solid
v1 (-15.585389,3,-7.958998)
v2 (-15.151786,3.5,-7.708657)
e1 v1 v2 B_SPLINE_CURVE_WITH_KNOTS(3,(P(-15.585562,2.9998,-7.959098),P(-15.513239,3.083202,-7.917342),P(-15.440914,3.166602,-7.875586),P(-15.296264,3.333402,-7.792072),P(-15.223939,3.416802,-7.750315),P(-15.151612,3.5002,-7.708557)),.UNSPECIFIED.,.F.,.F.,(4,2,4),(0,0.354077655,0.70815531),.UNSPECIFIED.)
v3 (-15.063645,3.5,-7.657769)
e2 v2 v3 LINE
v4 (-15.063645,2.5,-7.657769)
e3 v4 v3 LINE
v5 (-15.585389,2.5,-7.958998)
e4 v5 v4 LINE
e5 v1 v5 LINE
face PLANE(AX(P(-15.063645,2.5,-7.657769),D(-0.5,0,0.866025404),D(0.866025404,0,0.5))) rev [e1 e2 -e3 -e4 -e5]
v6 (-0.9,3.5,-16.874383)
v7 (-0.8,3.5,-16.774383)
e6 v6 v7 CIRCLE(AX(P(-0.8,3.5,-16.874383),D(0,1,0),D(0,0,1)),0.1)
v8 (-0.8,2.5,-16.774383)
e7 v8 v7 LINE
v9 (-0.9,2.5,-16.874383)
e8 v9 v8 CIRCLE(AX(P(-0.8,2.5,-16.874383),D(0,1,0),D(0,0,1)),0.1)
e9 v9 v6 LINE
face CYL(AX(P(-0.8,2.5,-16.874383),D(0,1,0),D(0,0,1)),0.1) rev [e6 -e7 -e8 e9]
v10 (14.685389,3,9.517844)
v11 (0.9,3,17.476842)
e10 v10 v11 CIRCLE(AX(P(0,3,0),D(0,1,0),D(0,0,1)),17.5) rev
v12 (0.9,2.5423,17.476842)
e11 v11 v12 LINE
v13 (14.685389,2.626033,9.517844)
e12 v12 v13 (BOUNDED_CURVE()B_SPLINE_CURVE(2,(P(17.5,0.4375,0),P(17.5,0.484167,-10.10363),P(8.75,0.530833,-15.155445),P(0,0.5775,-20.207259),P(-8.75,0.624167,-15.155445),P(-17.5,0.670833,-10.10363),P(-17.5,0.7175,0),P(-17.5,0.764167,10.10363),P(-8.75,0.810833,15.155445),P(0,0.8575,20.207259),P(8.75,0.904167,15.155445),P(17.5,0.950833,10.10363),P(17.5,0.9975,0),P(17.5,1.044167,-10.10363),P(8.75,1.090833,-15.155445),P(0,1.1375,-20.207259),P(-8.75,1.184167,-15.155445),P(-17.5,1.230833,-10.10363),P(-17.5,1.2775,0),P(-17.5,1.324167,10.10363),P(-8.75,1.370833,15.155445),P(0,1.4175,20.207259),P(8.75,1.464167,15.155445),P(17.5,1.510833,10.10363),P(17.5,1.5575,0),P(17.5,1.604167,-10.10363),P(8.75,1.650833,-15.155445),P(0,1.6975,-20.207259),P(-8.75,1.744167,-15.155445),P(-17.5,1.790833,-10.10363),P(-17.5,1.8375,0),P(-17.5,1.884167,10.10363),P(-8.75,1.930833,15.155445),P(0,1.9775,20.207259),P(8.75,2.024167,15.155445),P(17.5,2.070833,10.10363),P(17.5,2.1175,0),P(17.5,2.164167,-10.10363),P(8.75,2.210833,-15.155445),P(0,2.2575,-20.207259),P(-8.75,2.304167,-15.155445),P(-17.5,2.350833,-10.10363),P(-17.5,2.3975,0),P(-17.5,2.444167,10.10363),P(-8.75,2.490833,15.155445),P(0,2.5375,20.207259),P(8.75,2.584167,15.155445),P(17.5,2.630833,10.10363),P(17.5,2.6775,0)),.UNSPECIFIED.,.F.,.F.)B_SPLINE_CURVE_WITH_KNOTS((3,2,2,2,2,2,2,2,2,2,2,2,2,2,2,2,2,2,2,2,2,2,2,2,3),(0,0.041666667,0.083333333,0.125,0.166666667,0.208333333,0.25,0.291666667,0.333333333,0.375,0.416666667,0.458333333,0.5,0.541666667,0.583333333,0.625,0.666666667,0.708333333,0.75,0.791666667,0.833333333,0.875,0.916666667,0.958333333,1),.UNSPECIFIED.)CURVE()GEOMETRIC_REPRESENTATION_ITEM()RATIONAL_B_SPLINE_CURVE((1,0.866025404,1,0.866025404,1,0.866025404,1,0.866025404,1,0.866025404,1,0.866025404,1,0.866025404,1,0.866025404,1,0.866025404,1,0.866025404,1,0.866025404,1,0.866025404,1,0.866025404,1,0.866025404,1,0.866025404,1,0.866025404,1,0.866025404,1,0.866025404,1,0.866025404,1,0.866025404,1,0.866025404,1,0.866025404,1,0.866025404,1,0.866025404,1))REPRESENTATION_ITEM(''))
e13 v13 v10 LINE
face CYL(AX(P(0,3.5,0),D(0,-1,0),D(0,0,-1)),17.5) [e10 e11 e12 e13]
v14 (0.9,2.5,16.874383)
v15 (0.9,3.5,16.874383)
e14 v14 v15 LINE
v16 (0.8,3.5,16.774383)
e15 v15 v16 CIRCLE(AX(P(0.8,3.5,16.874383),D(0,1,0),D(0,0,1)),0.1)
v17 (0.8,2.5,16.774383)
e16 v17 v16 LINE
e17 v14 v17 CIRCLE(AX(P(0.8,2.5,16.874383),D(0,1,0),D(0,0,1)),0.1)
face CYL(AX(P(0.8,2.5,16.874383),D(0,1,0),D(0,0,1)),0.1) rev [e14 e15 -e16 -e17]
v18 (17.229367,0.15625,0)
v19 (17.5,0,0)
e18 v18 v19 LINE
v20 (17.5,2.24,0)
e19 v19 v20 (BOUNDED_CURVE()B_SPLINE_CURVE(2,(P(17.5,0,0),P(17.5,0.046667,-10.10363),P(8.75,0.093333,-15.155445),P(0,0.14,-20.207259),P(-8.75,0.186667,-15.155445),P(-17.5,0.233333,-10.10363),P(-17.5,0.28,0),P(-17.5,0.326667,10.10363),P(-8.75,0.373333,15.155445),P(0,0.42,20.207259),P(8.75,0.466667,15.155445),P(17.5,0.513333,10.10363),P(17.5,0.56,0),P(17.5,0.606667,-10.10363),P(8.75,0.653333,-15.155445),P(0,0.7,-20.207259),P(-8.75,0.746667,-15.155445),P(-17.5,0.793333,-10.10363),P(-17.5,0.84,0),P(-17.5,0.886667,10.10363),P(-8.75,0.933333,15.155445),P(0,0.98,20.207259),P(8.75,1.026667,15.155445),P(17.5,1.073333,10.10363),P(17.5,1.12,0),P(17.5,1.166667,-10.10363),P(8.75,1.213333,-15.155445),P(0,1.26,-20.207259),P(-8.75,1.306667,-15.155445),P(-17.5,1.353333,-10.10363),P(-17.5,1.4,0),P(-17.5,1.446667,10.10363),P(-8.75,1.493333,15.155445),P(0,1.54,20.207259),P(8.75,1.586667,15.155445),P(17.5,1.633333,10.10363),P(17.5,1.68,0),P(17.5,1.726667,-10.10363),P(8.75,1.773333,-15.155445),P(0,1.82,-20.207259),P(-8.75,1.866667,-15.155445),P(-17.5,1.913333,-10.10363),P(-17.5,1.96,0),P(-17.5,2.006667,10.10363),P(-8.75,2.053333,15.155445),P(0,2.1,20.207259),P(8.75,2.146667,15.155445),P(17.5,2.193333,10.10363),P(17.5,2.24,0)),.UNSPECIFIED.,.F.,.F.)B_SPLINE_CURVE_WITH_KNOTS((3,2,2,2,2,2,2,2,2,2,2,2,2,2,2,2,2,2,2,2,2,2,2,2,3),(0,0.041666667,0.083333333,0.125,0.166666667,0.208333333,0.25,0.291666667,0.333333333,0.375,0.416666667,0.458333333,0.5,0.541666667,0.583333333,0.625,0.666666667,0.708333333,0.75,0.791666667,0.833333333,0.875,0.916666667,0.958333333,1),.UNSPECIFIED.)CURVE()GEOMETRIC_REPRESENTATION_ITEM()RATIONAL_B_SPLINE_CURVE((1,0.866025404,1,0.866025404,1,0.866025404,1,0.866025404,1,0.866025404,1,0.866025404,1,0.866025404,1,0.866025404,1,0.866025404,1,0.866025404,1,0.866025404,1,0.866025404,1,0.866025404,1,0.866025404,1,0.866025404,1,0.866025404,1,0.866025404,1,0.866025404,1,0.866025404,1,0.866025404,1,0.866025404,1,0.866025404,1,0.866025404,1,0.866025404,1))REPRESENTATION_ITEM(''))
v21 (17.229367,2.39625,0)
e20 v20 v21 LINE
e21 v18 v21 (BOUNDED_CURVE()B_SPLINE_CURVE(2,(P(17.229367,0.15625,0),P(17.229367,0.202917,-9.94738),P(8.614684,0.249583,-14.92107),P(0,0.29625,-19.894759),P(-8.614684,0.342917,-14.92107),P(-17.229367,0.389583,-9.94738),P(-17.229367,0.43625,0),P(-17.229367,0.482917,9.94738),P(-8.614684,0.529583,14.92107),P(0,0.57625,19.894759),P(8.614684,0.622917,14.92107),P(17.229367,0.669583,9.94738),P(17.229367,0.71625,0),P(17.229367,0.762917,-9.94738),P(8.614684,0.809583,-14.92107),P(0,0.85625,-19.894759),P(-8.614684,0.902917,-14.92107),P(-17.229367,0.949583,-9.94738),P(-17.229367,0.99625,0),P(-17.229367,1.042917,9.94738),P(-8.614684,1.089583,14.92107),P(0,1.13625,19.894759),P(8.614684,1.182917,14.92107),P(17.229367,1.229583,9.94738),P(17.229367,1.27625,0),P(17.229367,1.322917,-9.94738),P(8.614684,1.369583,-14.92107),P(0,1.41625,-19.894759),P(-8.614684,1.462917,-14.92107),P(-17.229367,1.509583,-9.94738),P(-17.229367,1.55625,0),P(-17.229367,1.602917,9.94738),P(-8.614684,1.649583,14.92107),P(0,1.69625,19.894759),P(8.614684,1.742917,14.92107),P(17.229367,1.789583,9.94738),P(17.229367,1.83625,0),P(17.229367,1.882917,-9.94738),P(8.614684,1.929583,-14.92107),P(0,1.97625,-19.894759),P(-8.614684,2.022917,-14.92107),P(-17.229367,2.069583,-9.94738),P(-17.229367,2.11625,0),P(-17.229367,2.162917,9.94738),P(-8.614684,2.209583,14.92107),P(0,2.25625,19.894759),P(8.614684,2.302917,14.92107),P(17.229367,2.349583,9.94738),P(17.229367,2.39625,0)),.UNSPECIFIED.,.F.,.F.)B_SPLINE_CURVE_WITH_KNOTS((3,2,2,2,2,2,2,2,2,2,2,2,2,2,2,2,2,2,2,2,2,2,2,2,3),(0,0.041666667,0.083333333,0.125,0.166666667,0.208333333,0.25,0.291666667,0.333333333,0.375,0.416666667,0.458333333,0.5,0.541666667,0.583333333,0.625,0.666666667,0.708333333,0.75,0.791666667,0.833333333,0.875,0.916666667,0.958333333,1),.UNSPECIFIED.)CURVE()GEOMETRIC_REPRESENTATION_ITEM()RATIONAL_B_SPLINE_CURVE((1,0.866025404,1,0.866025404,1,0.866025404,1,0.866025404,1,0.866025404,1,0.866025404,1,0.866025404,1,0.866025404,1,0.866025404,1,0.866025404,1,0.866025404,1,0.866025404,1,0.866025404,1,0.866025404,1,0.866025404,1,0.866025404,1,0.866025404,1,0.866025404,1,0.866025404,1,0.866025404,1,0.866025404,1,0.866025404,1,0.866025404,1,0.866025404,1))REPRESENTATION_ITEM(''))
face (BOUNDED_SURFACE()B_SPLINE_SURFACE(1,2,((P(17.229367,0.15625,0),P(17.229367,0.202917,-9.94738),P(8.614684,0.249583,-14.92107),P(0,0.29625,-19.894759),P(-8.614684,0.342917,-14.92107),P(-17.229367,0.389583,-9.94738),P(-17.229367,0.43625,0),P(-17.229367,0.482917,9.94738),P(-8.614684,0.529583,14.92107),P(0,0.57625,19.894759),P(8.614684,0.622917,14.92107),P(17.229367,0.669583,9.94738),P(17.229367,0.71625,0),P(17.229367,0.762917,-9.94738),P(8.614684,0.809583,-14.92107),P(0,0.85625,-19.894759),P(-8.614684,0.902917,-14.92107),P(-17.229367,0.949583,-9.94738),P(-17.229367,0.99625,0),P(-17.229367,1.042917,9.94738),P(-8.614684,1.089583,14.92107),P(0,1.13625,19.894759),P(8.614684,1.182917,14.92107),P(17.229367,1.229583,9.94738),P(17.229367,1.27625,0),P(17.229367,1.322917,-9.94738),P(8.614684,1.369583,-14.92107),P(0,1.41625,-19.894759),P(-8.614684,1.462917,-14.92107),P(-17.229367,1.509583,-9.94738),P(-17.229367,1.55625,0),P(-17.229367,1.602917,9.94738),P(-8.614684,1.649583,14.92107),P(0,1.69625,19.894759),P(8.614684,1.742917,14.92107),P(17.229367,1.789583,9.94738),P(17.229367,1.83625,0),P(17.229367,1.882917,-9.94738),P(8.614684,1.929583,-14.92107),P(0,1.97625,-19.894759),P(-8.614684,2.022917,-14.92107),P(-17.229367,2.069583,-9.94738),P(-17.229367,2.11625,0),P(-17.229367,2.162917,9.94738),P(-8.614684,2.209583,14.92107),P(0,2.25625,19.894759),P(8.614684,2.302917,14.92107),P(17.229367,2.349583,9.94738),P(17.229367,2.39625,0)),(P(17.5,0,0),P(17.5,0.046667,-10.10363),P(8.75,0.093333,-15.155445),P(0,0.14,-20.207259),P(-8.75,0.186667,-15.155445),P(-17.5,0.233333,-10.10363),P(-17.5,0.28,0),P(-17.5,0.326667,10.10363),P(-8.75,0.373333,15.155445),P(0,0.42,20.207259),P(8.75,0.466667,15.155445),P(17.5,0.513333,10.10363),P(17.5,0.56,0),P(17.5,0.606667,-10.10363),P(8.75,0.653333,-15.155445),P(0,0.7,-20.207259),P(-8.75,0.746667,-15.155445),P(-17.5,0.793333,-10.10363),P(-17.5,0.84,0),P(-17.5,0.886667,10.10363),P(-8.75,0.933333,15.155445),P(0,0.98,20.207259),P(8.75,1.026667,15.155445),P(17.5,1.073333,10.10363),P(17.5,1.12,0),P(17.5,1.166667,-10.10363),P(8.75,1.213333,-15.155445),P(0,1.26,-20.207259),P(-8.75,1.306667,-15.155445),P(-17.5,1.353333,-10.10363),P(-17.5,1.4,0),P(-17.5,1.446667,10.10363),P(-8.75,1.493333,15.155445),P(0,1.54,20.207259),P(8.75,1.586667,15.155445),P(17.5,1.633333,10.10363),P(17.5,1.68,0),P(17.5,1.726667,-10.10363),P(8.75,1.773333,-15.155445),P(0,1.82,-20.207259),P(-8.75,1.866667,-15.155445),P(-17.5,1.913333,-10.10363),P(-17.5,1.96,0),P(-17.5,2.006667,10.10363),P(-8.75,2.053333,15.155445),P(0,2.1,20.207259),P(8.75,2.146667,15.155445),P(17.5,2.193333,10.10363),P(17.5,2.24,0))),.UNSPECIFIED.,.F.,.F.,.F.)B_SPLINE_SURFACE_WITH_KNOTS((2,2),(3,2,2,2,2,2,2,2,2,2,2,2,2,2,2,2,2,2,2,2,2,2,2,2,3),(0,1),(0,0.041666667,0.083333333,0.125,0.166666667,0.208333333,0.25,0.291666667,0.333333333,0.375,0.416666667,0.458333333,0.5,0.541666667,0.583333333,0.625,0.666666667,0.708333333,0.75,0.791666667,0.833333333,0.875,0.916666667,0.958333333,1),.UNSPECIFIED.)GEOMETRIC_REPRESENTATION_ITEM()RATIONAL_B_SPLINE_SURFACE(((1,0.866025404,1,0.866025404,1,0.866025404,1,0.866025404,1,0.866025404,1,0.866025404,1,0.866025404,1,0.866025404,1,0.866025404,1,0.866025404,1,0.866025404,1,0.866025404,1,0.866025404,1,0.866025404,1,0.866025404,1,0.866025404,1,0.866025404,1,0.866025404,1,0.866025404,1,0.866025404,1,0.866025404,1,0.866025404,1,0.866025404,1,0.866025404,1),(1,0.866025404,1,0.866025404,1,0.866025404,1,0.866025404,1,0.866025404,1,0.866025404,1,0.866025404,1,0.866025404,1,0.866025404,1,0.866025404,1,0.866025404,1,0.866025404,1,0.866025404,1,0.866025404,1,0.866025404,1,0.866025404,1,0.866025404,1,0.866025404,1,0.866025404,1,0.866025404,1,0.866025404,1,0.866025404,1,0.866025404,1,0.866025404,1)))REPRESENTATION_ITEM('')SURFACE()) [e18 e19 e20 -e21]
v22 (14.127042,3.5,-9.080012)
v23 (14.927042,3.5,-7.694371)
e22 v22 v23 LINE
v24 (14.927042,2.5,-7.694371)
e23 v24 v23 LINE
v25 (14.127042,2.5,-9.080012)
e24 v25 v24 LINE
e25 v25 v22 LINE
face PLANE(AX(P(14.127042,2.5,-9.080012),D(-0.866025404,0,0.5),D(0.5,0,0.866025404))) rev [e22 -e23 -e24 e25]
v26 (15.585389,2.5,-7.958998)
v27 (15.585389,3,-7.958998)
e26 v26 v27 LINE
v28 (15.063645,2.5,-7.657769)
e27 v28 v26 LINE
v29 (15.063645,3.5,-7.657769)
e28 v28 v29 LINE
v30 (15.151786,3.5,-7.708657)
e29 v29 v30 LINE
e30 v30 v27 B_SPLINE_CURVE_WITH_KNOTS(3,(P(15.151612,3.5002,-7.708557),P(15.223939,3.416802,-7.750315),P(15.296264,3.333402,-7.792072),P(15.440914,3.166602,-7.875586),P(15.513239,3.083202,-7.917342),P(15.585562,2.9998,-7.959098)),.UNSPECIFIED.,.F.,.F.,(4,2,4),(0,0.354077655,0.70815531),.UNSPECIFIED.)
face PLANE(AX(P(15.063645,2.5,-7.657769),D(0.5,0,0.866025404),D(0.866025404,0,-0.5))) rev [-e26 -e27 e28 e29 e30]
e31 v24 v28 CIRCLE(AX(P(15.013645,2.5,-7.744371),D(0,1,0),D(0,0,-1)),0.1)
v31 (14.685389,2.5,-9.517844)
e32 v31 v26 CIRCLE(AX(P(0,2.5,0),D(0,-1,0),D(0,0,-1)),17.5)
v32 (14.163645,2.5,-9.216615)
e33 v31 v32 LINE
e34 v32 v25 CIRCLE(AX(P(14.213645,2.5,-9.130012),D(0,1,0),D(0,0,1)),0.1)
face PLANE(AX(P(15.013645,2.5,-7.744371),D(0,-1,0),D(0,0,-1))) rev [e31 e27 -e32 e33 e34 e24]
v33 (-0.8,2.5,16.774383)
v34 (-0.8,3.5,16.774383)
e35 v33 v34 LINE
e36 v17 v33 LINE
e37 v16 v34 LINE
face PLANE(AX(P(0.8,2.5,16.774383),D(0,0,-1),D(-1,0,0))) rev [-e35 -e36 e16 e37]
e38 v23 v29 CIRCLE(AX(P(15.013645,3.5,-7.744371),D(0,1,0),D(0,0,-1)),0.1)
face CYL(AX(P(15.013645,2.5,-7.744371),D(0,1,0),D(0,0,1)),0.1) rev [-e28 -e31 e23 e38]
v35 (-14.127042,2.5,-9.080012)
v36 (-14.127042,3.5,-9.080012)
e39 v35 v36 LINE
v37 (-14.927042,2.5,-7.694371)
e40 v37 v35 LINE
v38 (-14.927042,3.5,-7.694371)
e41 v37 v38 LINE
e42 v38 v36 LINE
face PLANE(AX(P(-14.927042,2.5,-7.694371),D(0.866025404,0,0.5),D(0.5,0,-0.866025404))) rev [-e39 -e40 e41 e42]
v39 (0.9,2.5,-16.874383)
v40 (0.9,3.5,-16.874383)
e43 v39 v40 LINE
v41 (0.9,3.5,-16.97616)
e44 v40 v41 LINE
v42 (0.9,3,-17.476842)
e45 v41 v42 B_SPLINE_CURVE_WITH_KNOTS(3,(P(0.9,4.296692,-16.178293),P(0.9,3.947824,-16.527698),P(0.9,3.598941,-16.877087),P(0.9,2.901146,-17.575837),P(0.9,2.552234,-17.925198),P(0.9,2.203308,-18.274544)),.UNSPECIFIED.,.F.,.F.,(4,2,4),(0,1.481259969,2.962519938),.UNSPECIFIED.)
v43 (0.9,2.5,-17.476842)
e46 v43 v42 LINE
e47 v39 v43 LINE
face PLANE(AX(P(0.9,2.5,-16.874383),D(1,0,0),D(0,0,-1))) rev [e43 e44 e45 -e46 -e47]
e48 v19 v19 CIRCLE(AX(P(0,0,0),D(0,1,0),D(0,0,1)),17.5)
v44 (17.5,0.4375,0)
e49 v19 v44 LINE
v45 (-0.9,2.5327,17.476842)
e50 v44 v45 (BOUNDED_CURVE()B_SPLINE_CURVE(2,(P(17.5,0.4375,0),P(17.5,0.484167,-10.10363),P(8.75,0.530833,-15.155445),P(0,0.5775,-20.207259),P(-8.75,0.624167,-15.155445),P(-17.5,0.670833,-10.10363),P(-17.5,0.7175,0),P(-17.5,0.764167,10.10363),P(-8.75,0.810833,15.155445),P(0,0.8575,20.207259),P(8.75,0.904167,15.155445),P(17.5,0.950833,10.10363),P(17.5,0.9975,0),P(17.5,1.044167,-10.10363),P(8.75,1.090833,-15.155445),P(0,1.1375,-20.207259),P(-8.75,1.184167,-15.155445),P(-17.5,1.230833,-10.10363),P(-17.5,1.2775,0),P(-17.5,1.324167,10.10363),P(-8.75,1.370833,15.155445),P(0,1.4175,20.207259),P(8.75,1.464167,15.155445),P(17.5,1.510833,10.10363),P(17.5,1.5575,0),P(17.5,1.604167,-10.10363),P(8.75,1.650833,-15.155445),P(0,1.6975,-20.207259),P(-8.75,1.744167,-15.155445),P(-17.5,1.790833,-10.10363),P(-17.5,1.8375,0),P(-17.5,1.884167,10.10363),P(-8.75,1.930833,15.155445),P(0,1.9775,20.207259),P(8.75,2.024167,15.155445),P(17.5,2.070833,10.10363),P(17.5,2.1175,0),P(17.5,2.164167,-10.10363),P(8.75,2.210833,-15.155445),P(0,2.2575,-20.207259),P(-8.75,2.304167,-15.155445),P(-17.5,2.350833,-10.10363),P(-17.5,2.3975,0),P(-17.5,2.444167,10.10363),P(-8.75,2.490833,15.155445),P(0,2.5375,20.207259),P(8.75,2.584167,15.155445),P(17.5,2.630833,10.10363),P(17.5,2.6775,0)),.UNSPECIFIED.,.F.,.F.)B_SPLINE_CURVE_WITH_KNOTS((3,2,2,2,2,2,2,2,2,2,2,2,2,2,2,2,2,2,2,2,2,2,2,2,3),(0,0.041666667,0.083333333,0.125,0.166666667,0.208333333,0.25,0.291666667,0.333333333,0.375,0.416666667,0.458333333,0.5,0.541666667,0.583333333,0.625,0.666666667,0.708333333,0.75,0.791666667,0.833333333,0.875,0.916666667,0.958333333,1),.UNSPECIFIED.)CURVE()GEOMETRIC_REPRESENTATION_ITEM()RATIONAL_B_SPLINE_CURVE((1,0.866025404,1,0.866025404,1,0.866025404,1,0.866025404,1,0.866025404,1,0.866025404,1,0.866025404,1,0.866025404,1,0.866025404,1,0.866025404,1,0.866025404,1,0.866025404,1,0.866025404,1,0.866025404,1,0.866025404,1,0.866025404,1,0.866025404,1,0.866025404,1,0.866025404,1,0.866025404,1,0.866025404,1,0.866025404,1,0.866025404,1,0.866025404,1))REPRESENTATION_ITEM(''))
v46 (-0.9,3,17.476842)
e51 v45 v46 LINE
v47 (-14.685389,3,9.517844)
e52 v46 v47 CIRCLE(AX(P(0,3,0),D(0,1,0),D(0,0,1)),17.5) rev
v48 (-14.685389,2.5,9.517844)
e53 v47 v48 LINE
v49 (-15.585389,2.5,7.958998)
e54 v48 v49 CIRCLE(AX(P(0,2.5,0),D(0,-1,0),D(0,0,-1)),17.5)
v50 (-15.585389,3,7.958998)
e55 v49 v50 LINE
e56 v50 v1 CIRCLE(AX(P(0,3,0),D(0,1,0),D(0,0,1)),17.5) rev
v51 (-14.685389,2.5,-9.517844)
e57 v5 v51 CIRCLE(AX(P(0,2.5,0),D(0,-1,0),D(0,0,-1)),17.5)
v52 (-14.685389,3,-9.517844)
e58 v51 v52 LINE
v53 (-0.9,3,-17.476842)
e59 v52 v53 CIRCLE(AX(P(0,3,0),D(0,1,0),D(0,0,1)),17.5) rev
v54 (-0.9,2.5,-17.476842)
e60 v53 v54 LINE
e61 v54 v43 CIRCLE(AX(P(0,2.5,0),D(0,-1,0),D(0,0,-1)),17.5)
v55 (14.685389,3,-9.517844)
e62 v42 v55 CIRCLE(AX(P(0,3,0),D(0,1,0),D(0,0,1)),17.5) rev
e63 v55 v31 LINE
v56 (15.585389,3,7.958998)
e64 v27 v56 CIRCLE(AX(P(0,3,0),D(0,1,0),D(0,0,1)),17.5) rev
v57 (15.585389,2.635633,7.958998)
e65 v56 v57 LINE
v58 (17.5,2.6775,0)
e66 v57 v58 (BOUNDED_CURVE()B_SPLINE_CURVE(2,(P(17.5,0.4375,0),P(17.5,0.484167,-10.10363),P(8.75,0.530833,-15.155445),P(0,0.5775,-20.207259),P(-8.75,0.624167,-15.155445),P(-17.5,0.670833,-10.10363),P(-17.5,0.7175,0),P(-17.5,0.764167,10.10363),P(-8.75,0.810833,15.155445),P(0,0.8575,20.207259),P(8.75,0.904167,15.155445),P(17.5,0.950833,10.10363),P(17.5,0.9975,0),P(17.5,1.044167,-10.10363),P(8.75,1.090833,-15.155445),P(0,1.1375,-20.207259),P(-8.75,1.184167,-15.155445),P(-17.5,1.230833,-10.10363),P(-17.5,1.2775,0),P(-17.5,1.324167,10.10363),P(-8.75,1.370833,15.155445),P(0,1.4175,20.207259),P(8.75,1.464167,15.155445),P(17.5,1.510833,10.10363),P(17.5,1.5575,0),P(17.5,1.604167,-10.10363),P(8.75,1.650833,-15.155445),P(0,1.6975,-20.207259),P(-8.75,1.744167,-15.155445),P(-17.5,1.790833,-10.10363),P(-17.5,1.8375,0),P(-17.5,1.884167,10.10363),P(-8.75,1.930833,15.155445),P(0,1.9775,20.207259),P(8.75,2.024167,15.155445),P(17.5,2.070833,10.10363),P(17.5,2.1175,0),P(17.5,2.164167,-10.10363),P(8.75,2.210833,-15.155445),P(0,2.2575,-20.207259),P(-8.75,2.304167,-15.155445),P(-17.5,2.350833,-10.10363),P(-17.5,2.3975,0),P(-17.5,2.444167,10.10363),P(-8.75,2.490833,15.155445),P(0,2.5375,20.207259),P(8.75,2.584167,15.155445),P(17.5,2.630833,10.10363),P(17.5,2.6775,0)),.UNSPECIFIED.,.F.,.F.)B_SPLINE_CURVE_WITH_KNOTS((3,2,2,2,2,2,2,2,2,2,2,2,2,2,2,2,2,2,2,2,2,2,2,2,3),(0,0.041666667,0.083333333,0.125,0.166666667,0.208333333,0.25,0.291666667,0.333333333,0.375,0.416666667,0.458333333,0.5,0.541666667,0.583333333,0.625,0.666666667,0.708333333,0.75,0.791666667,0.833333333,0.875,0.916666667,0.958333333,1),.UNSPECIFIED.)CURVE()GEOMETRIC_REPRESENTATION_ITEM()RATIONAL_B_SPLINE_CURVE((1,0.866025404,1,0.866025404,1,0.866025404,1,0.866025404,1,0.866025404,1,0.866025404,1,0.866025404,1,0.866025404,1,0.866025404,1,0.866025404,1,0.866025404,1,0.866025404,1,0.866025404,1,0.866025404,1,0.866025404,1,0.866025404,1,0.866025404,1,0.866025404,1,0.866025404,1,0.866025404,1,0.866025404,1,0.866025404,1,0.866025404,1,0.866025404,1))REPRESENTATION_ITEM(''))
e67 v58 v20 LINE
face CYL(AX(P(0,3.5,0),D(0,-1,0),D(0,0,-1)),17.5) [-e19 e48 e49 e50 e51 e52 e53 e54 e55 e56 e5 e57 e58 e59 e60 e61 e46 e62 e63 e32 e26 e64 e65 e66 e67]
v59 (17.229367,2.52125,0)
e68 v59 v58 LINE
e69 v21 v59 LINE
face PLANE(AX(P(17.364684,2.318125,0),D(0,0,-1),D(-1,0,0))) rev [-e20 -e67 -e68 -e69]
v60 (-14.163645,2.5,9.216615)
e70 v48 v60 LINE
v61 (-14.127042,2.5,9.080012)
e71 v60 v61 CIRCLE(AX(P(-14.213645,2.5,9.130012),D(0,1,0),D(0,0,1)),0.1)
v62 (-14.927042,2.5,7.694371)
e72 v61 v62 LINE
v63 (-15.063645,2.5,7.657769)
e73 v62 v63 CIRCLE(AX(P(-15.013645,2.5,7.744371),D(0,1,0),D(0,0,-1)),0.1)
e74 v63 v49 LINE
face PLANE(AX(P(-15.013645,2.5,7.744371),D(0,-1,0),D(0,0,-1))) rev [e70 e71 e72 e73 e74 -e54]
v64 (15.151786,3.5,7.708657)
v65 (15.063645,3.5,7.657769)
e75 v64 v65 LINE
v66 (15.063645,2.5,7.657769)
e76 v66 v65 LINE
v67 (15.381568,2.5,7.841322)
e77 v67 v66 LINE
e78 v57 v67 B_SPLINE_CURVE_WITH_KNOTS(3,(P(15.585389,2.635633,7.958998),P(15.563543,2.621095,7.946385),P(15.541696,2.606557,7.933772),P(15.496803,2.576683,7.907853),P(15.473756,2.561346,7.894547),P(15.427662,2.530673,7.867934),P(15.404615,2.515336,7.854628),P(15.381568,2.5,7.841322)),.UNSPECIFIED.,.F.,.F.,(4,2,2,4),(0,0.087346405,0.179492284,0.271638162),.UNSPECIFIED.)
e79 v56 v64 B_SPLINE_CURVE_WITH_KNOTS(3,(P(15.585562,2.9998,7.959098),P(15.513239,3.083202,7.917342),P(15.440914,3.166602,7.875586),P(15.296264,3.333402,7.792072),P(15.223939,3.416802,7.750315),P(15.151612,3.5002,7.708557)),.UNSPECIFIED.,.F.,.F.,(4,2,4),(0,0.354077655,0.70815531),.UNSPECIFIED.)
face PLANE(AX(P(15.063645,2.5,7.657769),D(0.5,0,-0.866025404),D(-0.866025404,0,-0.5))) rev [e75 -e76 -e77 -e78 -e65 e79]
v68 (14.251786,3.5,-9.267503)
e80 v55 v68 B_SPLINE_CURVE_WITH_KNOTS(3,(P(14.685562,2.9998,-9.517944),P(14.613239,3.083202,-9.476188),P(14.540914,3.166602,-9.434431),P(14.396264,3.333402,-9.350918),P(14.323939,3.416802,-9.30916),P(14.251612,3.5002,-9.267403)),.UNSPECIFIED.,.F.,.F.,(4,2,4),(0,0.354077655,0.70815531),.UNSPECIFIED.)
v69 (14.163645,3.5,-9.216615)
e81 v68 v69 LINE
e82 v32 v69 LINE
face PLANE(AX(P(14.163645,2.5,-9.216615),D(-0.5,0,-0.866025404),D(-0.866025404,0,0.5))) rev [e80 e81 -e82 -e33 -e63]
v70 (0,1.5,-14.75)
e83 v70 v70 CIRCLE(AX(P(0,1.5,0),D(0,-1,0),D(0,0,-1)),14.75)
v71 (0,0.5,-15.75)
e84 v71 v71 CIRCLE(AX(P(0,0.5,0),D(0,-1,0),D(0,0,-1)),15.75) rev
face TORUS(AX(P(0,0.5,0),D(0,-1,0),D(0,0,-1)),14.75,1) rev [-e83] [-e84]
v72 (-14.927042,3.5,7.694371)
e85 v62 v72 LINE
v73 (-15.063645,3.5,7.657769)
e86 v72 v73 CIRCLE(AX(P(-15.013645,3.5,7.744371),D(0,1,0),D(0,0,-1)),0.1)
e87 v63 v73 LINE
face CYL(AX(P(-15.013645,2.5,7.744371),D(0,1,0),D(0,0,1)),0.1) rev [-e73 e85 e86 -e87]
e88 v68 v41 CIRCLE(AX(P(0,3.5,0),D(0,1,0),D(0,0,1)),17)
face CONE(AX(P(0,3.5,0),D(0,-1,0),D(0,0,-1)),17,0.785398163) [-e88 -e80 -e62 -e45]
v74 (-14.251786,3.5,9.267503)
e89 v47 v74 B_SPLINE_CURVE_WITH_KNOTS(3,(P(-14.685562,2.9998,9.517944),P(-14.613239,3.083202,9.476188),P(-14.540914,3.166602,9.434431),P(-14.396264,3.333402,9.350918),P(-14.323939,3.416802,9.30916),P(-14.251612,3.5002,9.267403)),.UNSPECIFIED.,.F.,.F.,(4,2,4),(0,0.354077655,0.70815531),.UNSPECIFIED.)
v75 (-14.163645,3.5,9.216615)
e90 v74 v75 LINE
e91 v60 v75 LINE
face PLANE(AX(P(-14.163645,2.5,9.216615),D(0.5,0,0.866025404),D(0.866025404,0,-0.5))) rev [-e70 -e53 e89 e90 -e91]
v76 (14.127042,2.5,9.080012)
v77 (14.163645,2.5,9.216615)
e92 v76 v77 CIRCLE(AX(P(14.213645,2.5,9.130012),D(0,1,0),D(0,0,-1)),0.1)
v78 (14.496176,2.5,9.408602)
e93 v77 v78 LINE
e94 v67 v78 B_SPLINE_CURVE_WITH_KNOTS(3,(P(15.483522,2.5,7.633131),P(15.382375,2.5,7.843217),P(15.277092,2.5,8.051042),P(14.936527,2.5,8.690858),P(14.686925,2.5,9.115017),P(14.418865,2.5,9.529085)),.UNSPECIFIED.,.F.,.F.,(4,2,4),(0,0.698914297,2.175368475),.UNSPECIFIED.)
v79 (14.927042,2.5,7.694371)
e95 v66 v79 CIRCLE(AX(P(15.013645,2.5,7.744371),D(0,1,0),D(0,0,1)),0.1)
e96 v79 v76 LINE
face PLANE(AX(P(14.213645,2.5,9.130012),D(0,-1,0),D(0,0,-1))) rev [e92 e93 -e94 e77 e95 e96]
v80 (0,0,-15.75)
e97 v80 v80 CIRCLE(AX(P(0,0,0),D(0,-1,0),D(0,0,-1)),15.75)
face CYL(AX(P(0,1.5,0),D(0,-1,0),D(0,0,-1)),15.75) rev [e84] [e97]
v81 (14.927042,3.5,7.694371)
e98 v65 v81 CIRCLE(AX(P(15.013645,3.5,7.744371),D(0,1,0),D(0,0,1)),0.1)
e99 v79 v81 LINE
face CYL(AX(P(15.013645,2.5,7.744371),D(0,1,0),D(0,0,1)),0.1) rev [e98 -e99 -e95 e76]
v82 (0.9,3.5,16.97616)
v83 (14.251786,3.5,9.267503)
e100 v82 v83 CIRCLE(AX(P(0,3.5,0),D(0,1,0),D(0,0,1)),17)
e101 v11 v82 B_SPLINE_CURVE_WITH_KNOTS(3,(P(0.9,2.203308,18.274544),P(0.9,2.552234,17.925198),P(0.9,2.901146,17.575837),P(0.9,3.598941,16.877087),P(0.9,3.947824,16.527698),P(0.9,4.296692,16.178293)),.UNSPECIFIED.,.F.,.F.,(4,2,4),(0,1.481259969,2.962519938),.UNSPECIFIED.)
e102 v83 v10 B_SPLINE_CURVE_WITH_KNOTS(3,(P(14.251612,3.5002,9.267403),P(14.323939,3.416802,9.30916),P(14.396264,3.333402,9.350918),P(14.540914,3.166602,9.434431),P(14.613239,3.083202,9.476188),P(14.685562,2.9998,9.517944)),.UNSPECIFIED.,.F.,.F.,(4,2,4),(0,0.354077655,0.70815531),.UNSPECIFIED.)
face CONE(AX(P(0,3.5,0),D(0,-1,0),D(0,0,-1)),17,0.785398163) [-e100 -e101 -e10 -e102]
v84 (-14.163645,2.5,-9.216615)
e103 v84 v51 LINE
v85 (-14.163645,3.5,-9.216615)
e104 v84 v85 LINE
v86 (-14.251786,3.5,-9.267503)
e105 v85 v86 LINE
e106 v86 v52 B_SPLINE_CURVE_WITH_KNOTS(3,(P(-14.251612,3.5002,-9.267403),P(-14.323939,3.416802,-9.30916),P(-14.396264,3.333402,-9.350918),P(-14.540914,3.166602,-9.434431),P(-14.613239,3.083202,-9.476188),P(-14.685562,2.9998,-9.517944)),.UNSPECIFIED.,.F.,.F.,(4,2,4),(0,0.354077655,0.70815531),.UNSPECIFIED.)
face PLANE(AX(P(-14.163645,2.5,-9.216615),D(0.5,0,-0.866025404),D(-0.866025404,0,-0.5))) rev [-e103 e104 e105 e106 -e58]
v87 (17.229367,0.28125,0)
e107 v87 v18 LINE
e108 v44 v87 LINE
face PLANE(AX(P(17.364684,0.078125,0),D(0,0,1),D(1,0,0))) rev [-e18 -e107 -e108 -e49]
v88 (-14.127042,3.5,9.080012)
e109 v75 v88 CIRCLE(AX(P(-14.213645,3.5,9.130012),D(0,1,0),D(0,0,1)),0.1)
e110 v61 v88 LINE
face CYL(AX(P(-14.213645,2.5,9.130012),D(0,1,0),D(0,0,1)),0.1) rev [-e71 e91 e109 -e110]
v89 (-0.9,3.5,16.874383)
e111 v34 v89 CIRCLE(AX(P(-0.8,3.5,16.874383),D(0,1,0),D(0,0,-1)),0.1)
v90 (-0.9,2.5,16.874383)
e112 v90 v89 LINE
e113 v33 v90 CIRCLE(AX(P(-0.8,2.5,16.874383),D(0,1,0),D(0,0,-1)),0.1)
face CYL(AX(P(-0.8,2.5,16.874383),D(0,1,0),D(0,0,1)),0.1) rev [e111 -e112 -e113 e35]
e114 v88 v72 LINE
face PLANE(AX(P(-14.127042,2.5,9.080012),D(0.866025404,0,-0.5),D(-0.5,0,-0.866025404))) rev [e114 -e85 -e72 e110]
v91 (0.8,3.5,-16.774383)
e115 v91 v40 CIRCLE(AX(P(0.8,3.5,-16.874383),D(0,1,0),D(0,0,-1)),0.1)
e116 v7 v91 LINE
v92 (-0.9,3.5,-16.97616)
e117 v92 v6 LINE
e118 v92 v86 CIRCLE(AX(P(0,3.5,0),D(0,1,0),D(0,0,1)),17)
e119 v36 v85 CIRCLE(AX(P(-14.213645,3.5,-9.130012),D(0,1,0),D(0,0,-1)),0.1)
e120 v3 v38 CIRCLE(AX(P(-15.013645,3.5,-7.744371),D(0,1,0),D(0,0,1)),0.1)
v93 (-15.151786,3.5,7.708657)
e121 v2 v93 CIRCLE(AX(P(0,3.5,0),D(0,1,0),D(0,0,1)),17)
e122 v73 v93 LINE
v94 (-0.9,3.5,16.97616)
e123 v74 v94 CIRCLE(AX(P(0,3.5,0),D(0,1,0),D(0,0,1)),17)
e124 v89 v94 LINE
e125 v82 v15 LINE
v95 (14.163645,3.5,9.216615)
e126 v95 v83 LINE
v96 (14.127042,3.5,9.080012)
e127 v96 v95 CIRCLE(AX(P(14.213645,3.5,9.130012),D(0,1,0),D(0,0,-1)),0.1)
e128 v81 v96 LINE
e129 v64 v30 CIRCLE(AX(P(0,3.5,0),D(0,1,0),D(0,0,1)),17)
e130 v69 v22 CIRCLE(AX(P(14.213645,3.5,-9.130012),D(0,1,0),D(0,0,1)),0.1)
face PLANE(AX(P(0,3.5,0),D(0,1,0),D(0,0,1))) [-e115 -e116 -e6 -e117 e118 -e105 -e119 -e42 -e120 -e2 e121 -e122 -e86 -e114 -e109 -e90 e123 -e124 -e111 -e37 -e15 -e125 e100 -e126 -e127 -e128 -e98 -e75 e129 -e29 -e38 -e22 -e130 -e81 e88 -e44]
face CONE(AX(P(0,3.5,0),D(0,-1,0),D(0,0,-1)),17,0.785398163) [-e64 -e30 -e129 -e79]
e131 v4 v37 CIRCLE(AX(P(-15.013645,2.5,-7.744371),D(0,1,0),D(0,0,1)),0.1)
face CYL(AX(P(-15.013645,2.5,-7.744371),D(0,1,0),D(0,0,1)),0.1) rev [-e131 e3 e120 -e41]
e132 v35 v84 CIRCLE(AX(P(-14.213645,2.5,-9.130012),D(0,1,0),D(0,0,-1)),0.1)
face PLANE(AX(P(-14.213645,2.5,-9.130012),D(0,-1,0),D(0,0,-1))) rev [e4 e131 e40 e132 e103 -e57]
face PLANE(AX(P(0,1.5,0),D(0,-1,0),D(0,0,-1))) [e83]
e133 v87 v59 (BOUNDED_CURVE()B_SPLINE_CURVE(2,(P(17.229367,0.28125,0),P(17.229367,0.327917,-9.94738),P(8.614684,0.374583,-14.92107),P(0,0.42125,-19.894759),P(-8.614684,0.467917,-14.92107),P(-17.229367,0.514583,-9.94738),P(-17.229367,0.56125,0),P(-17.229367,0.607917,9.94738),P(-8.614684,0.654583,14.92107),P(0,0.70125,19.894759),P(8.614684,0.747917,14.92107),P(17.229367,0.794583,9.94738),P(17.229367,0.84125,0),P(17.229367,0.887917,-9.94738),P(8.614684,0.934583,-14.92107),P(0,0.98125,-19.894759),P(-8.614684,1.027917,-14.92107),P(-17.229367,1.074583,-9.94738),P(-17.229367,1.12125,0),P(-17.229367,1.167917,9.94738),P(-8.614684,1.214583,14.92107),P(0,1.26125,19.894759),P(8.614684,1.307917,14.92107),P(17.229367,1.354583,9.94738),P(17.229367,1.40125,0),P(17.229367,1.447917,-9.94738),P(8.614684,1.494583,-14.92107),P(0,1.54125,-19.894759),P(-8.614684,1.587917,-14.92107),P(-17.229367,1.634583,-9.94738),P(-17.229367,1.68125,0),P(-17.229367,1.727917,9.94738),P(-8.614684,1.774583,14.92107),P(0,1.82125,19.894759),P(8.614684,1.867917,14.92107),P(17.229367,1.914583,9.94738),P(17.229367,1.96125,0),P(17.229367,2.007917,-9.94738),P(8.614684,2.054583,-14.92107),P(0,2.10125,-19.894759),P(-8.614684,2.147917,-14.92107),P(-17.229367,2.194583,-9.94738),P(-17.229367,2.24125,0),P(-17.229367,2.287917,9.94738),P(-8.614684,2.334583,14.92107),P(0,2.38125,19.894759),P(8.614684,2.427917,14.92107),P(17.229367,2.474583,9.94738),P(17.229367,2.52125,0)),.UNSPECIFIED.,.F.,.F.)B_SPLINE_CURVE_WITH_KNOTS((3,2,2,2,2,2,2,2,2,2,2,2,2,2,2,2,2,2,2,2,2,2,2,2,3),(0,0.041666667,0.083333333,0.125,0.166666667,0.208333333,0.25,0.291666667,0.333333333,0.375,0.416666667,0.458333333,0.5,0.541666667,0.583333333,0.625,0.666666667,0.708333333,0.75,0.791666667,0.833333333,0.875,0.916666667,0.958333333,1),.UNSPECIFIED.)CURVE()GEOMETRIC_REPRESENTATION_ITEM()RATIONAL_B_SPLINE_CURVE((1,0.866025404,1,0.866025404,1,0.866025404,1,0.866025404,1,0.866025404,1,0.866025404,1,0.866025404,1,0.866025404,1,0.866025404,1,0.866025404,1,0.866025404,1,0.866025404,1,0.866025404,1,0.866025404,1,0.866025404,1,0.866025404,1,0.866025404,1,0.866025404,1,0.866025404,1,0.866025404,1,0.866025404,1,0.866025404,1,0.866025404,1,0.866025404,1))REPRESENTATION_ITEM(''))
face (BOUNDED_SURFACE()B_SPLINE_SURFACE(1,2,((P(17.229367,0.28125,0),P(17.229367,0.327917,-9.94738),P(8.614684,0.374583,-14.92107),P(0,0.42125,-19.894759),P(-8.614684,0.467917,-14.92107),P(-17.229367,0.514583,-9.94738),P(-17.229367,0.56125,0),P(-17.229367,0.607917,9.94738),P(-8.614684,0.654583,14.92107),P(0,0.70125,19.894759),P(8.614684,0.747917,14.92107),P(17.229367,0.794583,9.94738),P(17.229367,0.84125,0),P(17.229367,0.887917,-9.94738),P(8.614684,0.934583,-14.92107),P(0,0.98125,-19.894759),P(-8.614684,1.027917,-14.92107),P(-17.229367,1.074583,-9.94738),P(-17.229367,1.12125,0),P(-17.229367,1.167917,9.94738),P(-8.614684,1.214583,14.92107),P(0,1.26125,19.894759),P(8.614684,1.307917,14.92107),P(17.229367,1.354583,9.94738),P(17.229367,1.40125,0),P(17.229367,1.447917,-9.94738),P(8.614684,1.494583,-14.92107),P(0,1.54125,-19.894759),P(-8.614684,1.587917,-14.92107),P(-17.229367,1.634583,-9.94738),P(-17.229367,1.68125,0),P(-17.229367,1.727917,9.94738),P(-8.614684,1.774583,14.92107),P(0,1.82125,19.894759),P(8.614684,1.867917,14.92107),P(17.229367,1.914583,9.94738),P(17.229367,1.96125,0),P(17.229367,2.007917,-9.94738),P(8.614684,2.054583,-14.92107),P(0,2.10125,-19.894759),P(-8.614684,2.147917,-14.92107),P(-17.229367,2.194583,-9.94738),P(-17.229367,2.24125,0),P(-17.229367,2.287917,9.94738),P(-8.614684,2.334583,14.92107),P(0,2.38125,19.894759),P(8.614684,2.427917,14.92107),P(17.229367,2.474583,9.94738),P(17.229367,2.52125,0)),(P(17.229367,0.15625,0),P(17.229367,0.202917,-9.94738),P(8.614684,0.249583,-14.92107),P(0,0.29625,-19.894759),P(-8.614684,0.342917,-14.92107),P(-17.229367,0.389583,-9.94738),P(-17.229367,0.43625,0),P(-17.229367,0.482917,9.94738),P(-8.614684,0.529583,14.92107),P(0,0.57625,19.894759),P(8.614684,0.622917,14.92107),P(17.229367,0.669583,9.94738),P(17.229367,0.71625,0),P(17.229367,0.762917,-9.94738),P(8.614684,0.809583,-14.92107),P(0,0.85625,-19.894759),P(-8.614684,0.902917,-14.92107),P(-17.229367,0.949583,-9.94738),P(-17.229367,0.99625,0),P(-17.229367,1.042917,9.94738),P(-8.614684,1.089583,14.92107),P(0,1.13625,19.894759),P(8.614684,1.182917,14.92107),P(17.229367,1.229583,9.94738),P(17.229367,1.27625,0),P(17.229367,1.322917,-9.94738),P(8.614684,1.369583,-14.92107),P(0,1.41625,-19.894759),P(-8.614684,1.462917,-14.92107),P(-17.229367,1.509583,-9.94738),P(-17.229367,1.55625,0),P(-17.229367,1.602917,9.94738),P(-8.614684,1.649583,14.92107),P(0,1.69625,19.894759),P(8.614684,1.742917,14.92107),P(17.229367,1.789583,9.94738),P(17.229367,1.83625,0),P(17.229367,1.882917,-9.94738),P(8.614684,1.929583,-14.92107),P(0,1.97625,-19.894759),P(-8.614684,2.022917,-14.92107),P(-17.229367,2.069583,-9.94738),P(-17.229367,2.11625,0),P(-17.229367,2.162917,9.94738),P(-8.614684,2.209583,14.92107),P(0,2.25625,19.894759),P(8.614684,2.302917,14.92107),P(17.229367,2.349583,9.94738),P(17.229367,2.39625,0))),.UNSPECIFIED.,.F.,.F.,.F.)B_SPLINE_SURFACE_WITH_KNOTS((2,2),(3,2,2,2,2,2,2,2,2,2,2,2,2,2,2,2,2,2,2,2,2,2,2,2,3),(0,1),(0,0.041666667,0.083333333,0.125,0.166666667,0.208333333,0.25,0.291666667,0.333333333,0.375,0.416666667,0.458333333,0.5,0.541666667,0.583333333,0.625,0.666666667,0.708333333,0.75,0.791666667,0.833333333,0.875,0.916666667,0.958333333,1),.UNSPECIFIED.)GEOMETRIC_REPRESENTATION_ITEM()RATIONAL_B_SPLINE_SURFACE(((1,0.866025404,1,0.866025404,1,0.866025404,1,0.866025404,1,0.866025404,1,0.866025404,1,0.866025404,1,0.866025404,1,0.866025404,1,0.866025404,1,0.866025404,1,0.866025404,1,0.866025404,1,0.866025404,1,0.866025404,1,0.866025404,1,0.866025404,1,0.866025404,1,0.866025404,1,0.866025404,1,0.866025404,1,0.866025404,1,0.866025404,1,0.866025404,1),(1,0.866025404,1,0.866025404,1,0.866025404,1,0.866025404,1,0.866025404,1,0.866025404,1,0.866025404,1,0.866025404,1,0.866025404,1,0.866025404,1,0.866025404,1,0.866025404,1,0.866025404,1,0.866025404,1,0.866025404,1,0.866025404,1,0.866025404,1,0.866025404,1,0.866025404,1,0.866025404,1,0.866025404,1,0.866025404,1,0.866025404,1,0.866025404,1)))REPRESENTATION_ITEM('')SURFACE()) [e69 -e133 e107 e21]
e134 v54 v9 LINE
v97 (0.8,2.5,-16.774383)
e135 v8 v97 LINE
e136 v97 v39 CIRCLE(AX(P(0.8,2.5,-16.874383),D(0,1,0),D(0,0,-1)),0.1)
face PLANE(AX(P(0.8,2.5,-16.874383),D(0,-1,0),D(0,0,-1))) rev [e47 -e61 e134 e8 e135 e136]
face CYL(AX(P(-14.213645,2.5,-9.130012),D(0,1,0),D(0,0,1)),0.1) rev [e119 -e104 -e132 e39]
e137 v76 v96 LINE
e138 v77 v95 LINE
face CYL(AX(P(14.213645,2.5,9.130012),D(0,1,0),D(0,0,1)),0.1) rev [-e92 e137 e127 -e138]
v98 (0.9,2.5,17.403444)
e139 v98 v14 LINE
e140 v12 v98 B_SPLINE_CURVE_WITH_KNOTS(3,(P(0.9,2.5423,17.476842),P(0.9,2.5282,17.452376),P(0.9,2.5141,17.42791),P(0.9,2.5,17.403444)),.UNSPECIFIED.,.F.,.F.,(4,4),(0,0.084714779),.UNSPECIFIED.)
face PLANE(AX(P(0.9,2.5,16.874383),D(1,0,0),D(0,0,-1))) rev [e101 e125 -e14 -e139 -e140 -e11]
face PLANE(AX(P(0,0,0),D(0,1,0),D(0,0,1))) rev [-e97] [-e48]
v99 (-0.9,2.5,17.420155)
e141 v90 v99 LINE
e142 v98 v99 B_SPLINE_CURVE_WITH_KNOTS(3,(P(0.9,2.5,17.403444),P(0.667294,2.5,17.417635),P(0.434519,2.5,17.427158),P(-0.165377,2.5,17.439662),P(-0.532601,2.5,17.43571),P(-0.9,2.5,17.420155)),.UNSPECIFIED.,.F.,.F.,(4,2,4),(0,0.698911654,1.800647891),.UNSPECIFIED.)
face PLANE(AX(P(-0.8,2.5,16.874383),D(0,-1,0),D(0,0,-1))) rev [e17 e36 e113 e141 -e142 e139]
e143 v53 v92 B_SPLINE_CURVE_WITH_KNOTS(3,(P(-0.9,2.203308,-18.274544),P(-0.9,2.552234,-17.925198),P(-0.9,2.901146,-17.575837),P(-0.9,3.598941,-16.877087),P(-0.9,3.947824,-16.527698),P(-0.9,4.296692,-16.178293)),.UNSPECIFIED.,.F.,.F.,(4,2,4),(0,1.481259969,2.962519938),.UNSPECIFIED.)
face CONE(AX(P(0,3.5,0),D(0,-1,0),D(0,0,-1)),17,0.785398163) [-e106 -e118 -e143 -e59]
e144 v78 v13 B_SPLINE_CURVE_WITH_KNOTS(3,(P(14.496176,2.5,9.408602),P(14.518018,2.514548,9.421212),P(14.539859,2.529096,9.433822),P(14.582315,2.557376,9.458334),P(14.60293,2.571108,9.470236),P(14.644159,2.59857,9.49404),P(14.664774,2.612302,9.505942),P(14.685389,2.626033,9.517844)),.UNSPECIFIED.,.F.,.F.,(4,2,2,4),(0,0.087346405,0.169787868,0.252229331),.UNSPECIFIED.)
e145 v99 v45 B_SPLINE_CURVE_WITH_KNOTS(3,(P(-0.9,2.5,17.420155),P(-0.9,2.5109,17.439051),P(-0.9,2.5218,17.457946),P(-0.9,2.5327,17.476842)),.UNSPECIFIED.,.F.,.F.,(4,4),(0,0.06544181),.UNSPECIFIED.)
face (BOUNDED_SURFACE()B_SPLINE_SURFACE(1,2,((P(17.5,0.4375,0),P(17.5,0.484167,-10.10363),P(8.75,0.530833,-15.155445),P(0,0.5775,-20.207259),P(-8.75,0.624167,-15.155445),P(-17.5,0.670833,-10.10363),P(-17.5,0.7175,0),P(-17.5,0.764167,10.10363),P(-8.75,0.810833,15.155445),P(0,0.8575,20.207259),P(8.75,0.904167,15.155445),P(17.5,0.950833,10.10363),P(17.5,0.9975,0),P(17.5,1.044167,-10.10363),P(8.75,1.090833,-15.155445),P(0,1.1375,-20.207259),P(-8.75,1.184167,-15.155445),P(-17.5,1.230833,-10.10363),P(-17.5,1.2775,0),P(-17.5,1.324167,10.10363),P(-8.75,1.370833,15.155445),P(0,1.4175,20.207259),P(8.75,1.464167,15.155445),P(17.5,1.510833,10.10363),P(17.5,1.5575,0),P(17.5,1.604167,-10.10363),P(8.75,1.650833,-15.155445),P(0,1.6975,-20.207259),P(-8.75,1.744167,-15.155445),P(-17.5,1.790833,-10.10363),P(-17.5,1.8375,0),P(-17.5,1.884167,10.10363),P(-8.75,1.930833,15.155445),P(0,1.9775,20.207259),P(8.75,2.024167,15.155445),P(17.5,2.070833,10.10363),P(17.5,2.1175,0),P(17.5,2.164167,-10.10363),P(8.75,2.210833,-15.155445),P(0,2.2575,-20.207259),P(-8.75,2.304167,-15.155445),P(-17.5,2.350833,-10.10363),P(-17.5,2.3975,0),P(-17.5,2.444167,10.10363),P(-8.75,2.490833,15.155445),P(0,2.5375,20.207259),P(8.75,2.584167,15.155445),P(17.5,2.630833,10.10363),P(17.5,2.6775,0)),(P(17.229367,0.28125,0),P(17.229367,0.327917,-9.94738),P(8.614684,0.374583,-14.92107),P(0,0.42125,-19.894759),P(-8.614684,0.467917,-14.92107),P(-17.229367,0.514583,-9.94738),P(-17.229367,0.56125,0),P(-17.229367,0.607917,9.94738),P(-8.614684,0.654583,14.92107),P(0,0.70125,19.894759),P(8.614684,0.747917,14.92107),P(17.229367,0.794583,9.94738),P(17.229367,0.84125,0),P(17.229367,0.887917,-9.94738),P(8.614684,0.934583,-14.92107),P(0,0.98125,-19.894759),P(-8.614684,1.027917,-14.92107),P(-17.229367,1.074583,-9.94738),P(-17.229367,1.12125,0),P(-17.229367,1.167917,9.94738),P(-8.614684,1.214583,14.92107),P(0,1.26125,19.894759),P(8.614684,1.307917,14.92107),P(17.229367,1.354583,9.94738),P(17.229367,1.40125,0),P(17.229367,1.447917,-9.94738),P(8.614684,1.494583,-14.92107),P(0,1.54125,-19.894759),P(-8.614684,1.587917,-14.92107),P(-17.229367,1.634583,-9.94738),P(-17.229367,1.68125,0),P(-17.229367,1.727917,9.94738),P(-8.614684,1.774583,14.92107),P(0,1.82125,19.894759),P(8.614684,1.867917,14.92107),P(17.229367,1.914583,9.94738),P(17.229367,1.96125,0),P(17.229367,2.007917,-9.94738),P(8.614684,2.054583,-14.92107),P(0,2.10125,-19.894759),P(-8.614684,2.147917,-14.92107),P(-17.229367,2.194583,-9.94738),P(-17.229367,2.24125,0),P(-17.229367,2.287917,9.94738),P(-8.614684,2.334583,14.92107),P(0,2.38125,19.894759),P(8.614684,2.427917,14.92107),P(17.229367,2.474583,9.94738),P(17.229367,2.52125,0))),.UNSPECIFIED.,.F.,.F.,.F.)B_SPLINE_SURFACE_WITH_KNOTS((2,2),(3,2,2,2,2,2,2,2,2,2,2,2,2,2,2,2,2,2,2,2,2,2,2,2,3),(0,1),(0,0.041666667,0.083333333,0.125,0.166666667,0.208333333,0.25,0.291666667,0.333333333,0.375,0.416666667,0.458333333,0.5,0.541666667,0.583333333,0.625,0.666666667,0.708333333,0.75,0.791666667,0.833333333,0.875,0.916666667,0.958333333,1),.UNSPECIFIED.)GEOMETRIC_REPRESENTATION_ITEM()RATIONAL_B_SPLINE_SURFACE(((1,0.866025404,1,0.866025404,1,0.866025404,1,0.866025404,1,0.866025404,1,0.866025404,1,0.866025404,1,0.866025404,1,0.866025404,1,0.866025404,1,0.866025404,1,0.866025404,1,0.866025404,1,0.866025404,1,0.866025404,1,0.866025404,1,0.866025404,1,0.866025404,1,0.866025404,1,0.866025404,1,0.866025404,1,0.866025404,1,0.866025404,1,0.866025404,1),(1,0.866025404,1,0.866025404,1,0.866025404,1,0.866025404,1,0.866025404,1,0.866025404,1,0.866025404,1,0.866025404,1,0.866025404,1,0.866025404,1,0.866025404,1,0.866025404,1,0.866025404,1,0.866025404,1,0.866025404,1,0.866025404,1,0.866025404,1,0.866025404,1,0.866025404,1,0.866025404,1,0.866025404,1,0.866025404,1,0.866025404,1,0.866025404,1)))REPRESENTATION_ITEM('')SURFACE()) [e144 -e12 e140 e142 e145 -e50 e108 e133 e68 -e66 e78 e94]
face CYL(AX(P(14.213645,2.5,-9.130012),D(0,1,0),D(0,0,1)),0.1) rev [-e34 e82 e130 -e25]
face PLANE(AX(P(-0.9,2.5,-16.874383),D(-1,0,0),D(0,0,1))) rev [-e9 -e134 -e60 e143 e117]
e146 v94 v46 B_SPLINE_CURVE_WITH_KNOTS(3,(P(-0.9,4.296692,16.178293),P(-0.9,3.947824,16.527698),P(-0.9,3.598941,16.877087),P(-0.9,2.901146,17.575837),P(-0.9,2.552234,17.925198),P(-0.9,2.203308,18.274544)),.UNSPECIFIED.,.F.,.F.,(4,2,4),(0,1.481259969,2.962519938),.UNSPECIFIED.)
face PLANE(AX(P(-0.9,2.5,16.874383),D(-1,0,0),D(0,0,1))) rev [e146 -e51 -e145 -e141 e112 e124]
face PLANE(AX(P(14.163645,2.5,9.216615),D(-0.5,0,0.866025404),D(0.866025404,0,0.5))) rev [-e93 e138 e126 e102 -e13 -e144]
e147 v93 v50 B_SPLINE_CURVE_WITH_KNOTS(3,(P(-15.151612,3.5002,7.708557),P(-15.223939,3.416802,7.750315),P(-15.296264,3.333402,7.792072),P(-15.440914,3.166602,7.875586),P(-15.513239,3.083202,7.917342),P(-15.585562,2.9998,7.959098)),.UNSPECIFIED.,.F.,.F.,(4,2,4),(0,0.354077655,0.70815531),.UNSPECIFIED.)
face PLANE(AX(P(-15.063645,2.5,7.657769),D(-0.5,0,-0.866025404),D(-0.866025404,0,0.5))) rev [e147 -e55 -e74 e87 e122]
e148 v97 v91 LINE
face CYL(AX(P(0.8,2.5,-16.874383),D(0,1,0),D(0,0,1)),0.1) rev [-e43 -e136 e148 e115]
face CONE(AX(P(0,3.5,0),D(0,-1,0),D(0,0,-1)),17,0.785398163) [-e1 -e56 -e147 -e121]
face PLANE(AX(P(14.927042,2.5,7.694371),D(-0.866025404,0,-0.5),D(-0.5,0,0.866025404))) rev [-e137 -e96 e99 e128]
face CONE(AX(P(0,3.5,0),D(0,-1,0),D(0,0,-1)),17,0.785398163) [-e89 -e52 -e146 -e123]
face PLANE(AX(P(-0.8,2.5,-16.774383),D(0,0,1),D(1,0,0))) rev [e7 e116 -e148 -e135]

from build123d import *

# Parameters (mm, degrees)
SKETCH1_R           = 17.5
BOSS_EXTRUDE1_DEPTH = 3.5
CHAMFER1_SIZE       = 0.5
CUT_EXTRUDE1_DEPTH  = 1
SKETCH4_R           = 15.75
CUT_EXTRUDE2_DEPTH  = 1.5
FILLET1_R           = 1
THREAD1_PITCH       = 0.56


with BuildPart() as part:
    # Sketch1 → Boss-Extrude1 (new body)
    with BuildSketch(Plane(origin=(0, 0, 0), x_dir=(1, 0, 0), z_dir=(0, 1, 0))):
        with Locations(Location((0, 0, 0), (0, 0, 270))):
            Circle(SKETCH1_R)
    extrude(amount=BOSS_EXTRUDE1_DEPTH)

    # Chamfer1
    chamfer1_edges = [part.edges().sort_by_distance(p)[0] for p in [
        (0, 3.5, -17.5),
    ]]
    chamfer(chamfer1_edges, length=CHAMFER1_SIZE)

    # Sketch3 → Cut-Extrude1 (cut)
    with BuildSketch(Plane(origin=(0, 3.5, 0), x_dir=(1, 0, 0), z_dir=(0, 1, 0))):
        with BuildLine():
            Line((14.163644775, 9.216614608), (14.700580525, 9.526614608))
            ThreePointArc((14.700580525, 9.526614608), (15.170616014, 8.75875924), (15.600580525, 7.967768881))
            Line((15.600580525, 7.967768881), (15.063644775, 7.657768881))
            ThreePointArc((15.063644775, 7.657768881), (14.98776287, 7.647778839), (14.927042235, 7.694371422))
            Line((14.927042235, 7.694371422), (14.127042235, 9.080012068))
            ThreePointArc((14.127042235, 9.080012068), (14.117052192, 9.155893972), (14.163644775, 9.216614608))
        make_face()
        with BuildLine():
            Line((-0.8, 16.774383489), (0.8, 16.774383489))
            ThreePointArc((0.8, 16.774383489), (0.870710678, 16.803672811), (0.9, 16.874383489))
            Line((0.9, 16.874383489), (0.9, 17.494383489))
            ThreePointArc((0.9, 17.494383489), (0, 17.517518479), (-0.9, 17.494383489))
            Line((-0.9, 17.494383489), (-0.9, 16.874383489))
            ThreePointArc((-0.9, 16.874383489), (-0.870710678, 16.803672811), (-0.8, 16.774383489))
        make_face()
        with BuildLine():
            Line((15.063644775, -7.657768881), (15.600580525, -7.967768881))
            ThreePointArc((15.600580525, -7.967768881), (15.170616014, -8.75875924), (14.700580525, -9.526614608))
            Line((14.700580525, -9.526614608), (14.163644775, -9.216614608))
            ThreePointArc((14.163644775, -9.216614608), (14.117052192, -9.155893972), (14.127042235, -9.080012068))
            Line((14.127042235, -9.080012068), (14.927042235, -7.694371422))
            ThreePointArc((14.927042235, -7.694371422), (14.98776287, -7.647778839), (15.063644775, -7.657768881))
        make_face()
        with BuildLine():
            Line((0.9, -16.874383489), (0.9, -17.494383489))
            ThreePointArc((0.9, -17.494383489), (0, -17.517518479), (-0.9, -17.494383489))
            Line((-0.9, -17.494383489), (-0.9, -16.874383489))
            ThreePointArc((-0.9, -16.874383489), (-0.870710678, -16.803672811), (-0.8, -16.774383489))
            Line((-0.8, -16.774383489), (0.8, -16.774383489))
            ThreePointArc((0.8, -16.774383489), (0.870710678, -16.803672811), (0.9, -16.874383489))
        make_face()
        with BuildLine():
            Line((-14.163644775, -9.216614608), (-14.700580525, -9.526614608))
            ThreePointArc((-14.700580525, -9.526614608), (-15.170616014, -8.75875924), (-15.600580525, -7.967768881))
            Line((-15.600580525, -7.967768881), (-15.063644775, -7.657768881))
            ThreePointArc((-15.063644775, -7.657768881), (-14.98776287, -7.647778839), (-14.927042235, -7.694371422))
            Line((-14.927042235, -7.694371422), (-14.127042235, -9.080012068))
            ThreePointArc((-14.127042235, -9.080012068), (-14.117052192, -9.155893972), (-14.163644775, -9.216614608))
        make_face()
        with BuildLine():
            Line((-15.063644775, 7.657768881), (-15.600580525, 7.967768881))
            ThreePointArc((-15.600580525, 7.967768881), (-15.170616014, 8.75875924), (-14.700580525, 9.526614608))
            Line((-14.700580525, 9.526614608), (-14.163644775, 9.216614608))
            ThreePointArc((-14.163644775, 9.216614608), (-14.117052192, 9.155893972), (-14.127042235, 9.080012068))
            Line((-14.127042235, 9.080012068), (-14.927042235, 7.694371422))
            ThreePointArc((-14.927042235, 7.694371422), (-14.98776287, 7.647778839), (-15.063644775, 7.657768881))
        make_face()
    extrude(amount=-CUT_EXTRUDE1_DEPTH, mode=Mode.SUBTRACT)

    # Sketch4 → Cut-Extrude2 (cut)
    with BuildSketch(Plane(origin=(0, 0, 0), x_dir=(-1, 0, 0), z_dir=(0, -1, 0))):
        with Locations(Location((0, 0, 0), (0, 0, 90))):
            Circle(SKETCH4_R)
    extrude(amount=-CUT_EXTRUDE2_DEPTH, mode=Mode.SUBTRACT)

    # Fillet1
    fillet1_edges = [part.edges().sort_by_distance(p)[0] for p in [
        (0, 1.5, 15.75),
    ]]
    fillet(fillet1_edges, radius=FILLET1_R)

    # Thread1: the profile of Thread Profile2 profile screwed along a right-hand helix of 4 turns, 6 arcs to a turn; built about Z, then put on its axis
    thread1_z = Axis((0, 0, 0), (0, 0, 1))
    thread1_corners = [(17.5003, 0, -0.000173205), (17.5003, 0, 0.437673204), (17.229367062, 0, 0.281249999), (17.229367062, 0, 0.156249999)]
    with BuildLine(mode=Mode.PRIVATE) as thread1_profile:
        Line(thread1_corners[0], thread1_corners[1])
        Line(thread1_corners[1], thread1_corners[2])
        Line(thread1_corners[2], thread1_corners[3])
        Line(thread1_corners[3], thread1_corners[0])
    thread1_cap = Face(thread1_profile.wire())
    thread1_turn_angles = [0, 30, 60, 90, 120, 150, 180, 210, 240, 270, 300, 330, 360]
    thread1_turn_weights = [1, 0.8660254037844387, 1, 0.8660254037844387, 1, 0.8660254037844387, 1, 0.8660254037844387, 1, 0.8660254037844387, 1, 0.8660254037844387, 1]
    thread1_turn_rails = [Edge.make_bspline([Vector(p[0], p[1], 0).rotate(thread1_z, thread1_turn_angles[k]) / thread1_turn_weights[k] + Vector(0, 0, p[2] + THREAD1_PITCH * thread1_turn_angles[k] / 360) for k in range(13)], [0, 0, 0, 1, 1, 2, 2, 3, 3, 4, 4, 5, 5, 6, 6, 6], 2, thread1_turn_weights) for p in thread1_corners]
    thread1_turn_sides = [Face.make_surface_from_curves(thread1_turn_rails[p[0]], thread1_turn_rails[p[1]]) for p in [(0, 1), (1, 2), (2, 3), (3, 0)]]
    thread1 = Plane(origin=(0, 0, 0), x_dir=(1, 0, 0), z_dir=(0, 1, 0)) * Solid(Shell([*[p.moved(Location((0, 0, THREAD1_PITCH * i))) for i in range(4) for p in thread1_turn_sides], thread1_cap, thread1_cap.rotate(thread1_z, 1440).moved(Location((0, 0, THREAD1_PITCH * 1440 / 360)))]))
    add(thread1, mode=Mode.SUBTRACT)


solid = part.part
